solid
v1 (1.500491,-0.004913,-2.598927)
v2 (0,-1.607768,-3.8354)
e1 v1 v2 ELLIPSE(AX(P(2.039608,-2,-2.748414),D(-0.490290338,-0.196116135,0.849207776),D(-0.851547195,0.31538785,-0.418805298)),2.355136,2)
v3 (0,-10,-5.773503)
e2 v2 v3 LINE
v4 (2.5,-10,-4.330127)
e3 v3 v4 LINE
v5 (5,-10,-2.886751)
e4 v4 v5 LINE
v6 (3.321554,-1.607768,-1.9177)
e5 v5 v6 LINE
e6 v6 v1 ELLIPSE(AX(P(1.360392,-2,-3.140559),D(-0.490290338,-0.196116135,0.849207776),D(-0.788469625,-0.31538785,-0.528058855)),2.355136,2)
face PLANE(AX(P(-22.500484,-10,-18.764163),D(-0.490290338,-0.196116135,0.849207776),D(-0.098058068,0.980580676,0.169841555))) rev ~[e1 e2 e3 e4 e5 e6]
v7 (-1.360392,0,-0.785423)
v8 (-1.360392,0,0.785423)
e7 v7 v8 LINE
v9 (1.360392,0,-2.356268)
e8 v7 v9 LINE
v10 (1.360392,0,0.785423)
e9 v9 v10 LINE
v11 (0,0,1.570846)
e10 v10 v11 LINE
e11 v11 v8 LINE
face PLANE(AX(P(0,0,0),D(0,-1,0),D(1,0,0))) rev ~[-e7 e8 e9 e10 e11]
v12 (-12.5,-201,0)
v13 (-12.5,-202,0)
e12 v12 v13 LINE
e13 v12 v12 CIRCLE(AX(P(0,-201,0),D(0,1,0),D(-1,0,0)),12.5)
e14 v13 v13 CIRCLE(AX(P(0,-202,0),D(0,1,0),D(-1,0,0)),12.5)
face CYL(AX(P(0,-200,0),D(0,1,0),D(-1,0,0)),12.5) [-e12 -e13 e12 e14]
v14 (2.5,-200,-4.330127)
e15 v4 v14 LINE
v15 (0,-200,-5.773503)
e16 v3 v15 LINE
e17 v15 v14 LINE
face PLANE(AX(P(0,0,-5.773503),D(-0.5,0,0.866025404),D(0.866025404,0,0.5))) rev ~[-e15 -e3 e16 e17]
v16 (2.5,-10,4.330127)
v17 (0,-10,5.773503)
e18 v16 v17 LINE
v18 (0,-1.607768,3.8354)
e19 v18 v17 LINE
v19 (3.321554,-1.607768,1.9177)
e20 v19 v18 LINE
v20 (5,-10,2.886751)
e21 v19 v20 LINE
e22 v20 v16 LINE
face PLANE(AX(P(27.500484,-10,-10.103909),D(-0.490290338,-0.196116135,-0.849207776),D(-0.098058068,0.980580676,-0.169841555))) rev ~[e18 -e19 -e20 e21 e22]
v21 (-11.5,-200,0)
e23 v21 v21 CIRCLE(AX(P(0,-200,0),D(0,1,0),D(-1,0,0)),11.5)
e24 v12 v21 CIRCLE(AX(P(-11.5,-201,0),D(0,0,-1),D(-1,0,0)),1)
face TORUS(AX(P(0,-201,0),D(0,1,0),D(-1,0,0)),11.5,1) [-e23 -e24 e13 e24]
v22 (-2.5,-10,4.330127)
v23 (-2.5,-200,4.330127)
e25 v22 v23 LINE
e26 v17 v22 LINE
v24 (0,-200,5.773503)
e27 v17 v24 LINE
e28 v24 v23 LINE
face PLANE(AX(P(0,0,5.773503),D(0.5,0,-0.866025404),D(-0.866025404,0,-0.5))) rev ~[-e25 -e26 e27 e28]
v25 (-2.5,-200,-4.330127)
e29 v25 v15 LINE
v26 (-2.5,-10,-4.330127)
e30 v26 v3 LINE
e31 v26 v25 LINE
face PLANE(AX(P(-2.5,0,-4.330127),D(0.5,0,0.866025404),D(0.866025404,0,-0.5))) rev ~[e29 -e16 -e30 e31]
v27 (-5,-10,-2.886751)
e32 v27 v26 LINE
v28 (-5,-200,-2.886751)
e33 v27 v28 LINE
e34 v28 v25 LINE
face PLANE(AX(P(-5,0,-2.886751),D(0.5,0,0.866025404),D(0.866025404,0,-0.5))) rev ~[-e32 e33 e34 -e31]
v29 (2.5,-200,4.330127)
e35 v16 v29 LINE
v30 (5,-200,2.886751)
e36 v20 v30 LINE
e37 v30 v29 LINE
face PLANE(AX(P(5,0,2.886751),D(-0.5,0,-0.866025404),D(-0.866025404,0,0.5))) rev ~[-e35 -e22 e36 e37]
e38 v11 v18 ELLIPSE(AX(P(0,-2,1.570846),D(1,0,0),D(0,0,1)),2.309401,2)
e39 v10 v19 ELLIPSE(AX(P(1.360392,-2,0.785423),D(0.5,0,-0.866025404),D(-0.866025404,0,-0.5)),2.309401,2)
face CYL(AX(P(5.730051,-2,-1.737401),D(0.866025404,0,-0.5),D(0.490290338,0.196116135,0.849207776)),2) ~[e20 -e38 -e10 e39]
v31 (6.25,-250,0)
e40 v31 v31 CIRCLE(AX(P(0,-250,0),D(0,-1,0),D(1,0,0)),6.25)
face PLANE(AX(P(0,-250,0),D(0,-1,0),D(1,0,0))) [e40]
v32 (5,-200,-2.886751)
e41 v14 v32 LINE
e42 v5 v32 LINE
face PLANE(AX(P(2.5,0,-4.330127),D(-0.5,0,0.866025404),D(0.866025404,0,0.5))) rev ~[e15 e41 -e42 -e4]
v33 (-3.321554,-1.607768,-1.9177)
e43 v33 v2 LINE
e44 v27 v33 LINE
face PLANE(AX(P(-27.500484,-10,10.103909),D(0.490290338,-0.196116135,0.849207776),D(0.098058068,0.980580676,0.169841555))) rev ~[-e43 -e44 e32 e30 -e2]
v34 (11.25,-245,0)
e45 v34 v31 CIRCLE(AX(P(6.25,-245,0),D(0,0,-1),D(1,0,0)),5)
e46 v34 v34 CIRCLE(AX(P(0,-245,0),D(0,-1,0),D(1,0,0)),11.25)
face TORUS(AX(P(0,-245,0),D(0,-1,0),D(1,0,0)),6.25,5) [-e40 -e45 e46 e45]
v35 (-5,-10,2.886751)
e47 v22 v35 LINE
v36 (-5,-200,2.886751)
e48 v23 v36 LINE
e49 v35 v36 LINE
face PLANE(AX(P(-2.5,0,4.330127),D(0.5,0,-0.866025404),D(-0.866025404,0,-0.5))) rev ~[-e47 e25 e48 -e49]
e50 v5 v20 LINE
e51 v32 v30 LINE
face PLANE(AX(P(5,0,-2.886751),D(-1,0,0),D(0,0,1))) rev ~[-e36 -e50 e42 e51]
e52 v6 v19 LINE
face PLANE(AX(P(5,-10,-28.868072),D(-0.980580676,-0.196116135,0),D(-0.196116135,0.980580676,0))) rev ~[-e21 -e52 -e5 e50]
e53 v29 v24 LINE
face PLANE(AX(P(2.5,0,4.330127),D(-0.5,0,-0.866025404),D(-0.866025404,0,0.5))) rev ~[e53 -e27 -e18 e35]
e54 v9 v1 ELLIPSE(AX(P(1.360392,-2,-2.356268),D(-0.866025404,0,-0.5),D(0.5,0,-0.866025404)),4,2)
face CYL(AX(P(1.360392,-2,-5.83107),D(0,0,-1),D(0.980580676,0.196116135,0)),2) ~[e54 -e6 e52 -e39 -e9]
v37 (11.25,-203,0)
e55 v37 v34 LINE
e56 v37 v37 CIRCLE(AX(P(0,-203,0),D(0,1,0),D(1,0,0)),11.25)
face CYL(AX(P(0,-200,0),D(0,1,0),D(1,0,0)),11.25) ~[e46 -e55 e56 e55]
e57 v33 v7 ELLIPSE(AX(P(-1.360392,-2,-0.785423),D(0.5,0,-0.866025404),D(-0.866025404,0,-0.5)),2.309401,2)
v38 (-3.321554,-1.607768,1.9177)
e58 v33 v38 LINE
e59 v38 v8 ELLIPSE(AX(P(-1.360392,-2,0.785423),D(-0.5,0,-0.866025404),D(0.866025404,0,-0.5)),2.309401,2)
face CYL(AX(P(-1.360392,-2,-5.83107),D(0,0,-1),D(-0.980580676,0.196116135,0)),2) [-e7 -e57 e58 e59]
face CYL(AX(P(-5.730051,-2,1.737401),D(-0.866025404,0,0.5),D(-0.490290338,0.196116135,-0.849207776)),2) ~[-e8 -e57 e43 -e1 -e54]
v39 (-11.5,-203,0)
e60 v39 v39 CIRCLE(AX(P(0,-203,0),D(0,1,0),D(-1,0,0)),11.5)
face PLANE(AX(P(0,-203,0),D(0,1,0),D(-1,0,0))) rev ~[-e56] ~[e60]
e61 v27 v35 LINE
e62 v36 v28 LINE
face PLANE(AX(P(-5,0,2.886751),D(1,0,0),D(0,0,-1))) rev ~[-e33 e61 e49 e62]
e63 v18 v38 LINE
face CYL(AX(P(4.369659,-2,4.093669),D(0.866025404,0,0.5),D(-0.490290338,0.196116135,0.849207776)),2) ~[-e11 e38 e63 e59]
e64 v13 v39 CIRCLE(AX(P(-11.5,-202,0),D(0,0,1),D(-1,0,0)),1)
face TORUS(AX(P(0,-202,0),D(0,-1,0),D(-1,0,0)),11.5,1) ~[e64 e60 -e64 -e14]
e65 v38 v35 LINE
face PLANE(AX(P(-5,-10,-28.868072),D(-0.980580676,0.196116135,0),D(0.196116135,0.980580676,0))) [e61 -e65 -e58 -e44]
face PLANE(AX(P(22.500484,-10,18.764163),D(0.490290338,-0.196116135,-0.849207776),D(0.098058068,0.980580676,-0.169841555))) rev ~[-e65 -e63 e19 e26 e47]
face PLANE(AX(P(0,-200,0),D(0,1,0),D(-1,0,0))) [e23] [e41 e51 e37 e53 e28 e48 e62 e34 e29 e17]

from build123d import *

# Parameters (mm, degrees)
F1_DEPTH    = 200
F2_R        = 11.25
F3_DEPTH    = 50
F4_R        = 12.5
F5_DEPTH    = 3
F6_R        = 1
F7_R        = 5
F8_T1_DEPTH = 57.7361444178
F8_T3_DEPTH = 57.7361444178
F8_T5_DEPTH = 57.7361444178
F8_T7_DEPTH = 57.7361444178
F8_T9_DEPTH = 57.7361444178
F9_T1_DEPTH = 11.6621406423
F9_T3_DEPTH = 11.6621406423
F9_T5_DEPTH = 11.6621406423
F9_T7_DEPTH = 11.6621406423


# Not quite as in the source:
# - a fillet or chamfer that OpenCascade refuses, or shapes differently, is made with other operations: its cross-section is extruded or revolved along the edge and cut away or added


with BuildPart() as f1:
    # F0 (on Front) → F1 (new body)
    with BuildSketch(Plane.XZ):
        with BuildLine():
            ThreePointArc((2.5000000636, -4.3301269822), (4.3301270373, -2.4999999682), (5, 0))
            ThreePointArc((5, 0), (4.3301270373, 2.4999999682), (2.5000000636, 4.3301269822))
            ThreePointArc((2.5000000636, 4.3301269822), (1.215e-07, 5), (-2.4999998532, 4.3301271037))
            ThreePointArc((-2.4999998532, 4.3301271037), (-4.3301269765, 2.5000000734), (-5, 0))
            ThreePointArc((-5, 0), (-4.3301270351, -2.4999999721), (-2.5000000559, -4.3301269867))
            ThreePointArc((-2.5000000559, -4.3301269867), (4.5e-09, -5), (2.5000000636, -4.3301269822))
        make_face()
        with BuildLine():
            Line((5, -2.8867513459), (5, 0))
            ThreePointArc((5, 0), (4.3301270373, -2.4999999682), (2.5000000636, -4.3301269822))
            Line((2.5000000636, -4.3301269822), (5, -2.8867513459))
        make_face()
        with BuildLine():
            ThreePointArc((2.5000000636, 4.3301269822), (4.3301270373, 2.4999999682), (5, 0))
            Line((5, 0), (5, 2.8867513459))
            Line((5, 2.8867513459), (2.5000000636, 4.3301269822))
        make_face()
        with BuildLine():
            ThreePointArc((-2.4999998532, 4.3301271037), (1.215e-07, 5), (2.5000000636, 4.3301269822))
            Line((2.5000000636, 4.3301269822), (0, 5.7735026919))
            Line((0, 5.7735026919), (-2.4999998532, 4.3301271037))
        make_face()
        with BuildLine():
            Line((0, -5.7735026919), (2.5000000636, -4.3301269822))
            ThreePointArc((2.5000000636, -4.3301269822), (4.5e-09, -5), (-2.5000000559, -4.3301269867))
            Line((-2.5000000559, -4.3301269867), (0, -5.7735026919))
        make_face()
        with BuildLine():
            ThreePointArc((-5, 0), (-4.3301269765, 2.5000000734), (-2.4999998532, 4.3301271037))
            Line((-2.4999998532, 4.3301271037), (-5, 2.8867513459))
            Line((-5, 2.8867513459), (-5, 0))
        make_face()
        with BuildLine():
            Line((-5, -2.8867513459), (-2.5000000559, -4.3301269867))
            ThreePointArc((-2.5000000559, -4.3301269867), (-4.3301270351, -2.4999999721), (-5, 0))
            Line((-5, 0), (-5, -2.8867513459))
        make_face()
    extrude(amount=F1_DEPTH)

    # F2 (on face) → F3 (join)
    with BuildSketch(Plane.XZ.offset(200)):
        Circle(F2_R)
    extrude(amount=F3_DEPTH)

    # F4 (on face) → F5 (join)
    with BuildSketch(Plane(origin=(0, -200, 0), x_dir=(-1, 0, 0), z_dir=(0, 1, 0))):
        Circle(F4_R)
    extrude(amount=-F5_DEPTH)

    # F6
    f6_edges = [f1.edges().sort_by_distance(p)[0] for p in [
        (12.5, -203, 0),
        (12.5, -200, 0),
    ]]
    fillet(f6_edges, radius=F6_R)

    # F7
    f7_edges = [f1.edges().sort_by_distance(p)[0] for p in [
        (-11.25, -250, 0),
    ]]
    fillet(f7_edges, radius=F7_R)

    # F8: chamfer of 2 x 10 on 6 edges, made by hand

    # F8_s2 → F8_t1 (cut)
    with BuildSketch(Plane.XY.offset(-28.8680722089)):
        Polygon((5, -10), (3, 0), (5, 0), align=None)
        Polygon((-5, -10), (-3, 0), (-5, 0), align=None)
    extrude(amount=F8_T1_DEPTH, mode=Mode.SUBTRACT)

    # F8_s4 → F8_t3 (cut)
    with BuildSketch(Plane(origin=(25.0004838912, 0, -14.4340361045), x_dir=(0, 1, 0), z_dir=(-0.8660254038, 0, 0.5))):
        Polygon((-10, -5), (0, -3), (0, -5), align=None)
    extrude(amount=F8_T3_DEPTH, mode=Mode.SUBTRACT)

    # F8_s6 → F8_t5 (cut)
    with BuildSketch(Plane(origin=(25.0004838912, 0, 14.4340361045), x_dir=(0, 1, 0), z_dir=(-0.8660254038, 0, -0.5))):
        Polygon((-10, -5), (0, -3), (0, -5), align=None)
    extrude(amount=F8_T5_DEPTH, mode=Mode.SUBTRACT)

    # F8_s8 → F8_t7 (cut)
    with BuildSketch(Plane(origin=(-25.0004838912, 0, 14.4340361045), x_dir=(0, 1, 0), z_dir=(0.8660254038, 0, -0.5))):
        Polygon((-10, -5), (0, -3), (0, -5), align=None)
    extrude(amount=F8_T7_DEPTH, mode=Mode.SUBTRACT)

    # F8_s10 → F8_t9 (cut)
    with BuildSketch(Plane(origin=(-25.0004838912, 0, -14.4340361045), x_dir=(0, 1, 0), z_dir=(0.8660254038, 0, 0.5))):
        Polygon((-10, -5), (0, -3), (0, -5), align=None)
    extrude(amount=F8_T9_DEPTH, mode=Mode.SUBTRACT)

    # F9: fillet of radius 2 on 5 edges, made by hand

    # F9_s2 → F9_t1 (cut)
    with BuildSketch(Plane.XY.offset(-5.8310703212)):
        with BuildLine():
            ThreePointArc((3.3215535459, -1.6077677297), (2.6283700058, -0.4533157173), (1.3603921946, 0))
            Line((1.3603921946, 0), (3, 0))
            Line((3, 0), (3.3215535459, -1.6077677297))
        make_face()
        with BuildLine():
            ThreePointArc((-3.3215535459, -1.6077677297), (-2.6283700058, -0.4533157173), (-1.3603921946, 0))
            Line((-1.3603921946, 0), (-3, 0))
            Line((-3, 0), (-3.3215535459, -1.6077677297))
        make_face()
    extrude(amount=F9_T1_DEPTH, mode=Mode.SUBTRACT)

    # F9_s4 → F9_t3 (cut)
    with BuildSketch(Plane(origin=(5.0498550294, 0, 2.9155351606), x_dir=(0, 1, 0), z_dir=(-0.8660254038, 0, -0.5))):
        with BuildLine():
            ThreePointArc((-1.6077677297, -3.3215535459), (-0.4533157173, -2.6283700058), (0, -1.3603921946))
            Line((0, -1.3603921946), (0, -3))
            Line((0, -3), (-1.6077677297, -3.3215535459))
        make_face()
    extrude(amount=F9_T3_DEPTH, mode=Mode.SUBTRACT)

    # F9_s6 → F9_t5 (cut)
    with BuildSketch(Plane(origin=(-5.0498550294, 0, 2.9155351606), x_dir=(0, 1, 0), z_dir=(0.8660254038, 0, -0.5))):
        with BuildLine():
            ThreePointArc((-1.6077677297, -3.3215535459), (-0.4533157173, -2.6283700058), (0, -1.3603921946))
            Line((0, -1.3603921946), (0, -3))
            Line((0, -3), (-1.6077677297, -3.3215535459))
        make_face()
    extrude(amount=F9_T5_DEPTH, mode=Mode.SUBTRACT)

    # F9_s8 → F9_t7 (cut)
    with BuildSketch(Plane(origin=(5.0498550294, 0, -2.9155351606), x_dir=(0, 1, 0), z_dir=(-0.8660254038, 0, 0.5))):
        with BuildLine():
            ThreePointArc((-1.6077677297, -3.3215535459), (-0.4533157173, -2.6283700058), (0, -1.3603921946))
            Line((0, -1.3603921946), (0, -3))
            Line((0, -3), (-1.6077677297, -3.3215535459))
        make_face()
    extrude(amount=F9_T7_DEPTH, mode=Mode.SUBTRACT)


solid = f1.part
